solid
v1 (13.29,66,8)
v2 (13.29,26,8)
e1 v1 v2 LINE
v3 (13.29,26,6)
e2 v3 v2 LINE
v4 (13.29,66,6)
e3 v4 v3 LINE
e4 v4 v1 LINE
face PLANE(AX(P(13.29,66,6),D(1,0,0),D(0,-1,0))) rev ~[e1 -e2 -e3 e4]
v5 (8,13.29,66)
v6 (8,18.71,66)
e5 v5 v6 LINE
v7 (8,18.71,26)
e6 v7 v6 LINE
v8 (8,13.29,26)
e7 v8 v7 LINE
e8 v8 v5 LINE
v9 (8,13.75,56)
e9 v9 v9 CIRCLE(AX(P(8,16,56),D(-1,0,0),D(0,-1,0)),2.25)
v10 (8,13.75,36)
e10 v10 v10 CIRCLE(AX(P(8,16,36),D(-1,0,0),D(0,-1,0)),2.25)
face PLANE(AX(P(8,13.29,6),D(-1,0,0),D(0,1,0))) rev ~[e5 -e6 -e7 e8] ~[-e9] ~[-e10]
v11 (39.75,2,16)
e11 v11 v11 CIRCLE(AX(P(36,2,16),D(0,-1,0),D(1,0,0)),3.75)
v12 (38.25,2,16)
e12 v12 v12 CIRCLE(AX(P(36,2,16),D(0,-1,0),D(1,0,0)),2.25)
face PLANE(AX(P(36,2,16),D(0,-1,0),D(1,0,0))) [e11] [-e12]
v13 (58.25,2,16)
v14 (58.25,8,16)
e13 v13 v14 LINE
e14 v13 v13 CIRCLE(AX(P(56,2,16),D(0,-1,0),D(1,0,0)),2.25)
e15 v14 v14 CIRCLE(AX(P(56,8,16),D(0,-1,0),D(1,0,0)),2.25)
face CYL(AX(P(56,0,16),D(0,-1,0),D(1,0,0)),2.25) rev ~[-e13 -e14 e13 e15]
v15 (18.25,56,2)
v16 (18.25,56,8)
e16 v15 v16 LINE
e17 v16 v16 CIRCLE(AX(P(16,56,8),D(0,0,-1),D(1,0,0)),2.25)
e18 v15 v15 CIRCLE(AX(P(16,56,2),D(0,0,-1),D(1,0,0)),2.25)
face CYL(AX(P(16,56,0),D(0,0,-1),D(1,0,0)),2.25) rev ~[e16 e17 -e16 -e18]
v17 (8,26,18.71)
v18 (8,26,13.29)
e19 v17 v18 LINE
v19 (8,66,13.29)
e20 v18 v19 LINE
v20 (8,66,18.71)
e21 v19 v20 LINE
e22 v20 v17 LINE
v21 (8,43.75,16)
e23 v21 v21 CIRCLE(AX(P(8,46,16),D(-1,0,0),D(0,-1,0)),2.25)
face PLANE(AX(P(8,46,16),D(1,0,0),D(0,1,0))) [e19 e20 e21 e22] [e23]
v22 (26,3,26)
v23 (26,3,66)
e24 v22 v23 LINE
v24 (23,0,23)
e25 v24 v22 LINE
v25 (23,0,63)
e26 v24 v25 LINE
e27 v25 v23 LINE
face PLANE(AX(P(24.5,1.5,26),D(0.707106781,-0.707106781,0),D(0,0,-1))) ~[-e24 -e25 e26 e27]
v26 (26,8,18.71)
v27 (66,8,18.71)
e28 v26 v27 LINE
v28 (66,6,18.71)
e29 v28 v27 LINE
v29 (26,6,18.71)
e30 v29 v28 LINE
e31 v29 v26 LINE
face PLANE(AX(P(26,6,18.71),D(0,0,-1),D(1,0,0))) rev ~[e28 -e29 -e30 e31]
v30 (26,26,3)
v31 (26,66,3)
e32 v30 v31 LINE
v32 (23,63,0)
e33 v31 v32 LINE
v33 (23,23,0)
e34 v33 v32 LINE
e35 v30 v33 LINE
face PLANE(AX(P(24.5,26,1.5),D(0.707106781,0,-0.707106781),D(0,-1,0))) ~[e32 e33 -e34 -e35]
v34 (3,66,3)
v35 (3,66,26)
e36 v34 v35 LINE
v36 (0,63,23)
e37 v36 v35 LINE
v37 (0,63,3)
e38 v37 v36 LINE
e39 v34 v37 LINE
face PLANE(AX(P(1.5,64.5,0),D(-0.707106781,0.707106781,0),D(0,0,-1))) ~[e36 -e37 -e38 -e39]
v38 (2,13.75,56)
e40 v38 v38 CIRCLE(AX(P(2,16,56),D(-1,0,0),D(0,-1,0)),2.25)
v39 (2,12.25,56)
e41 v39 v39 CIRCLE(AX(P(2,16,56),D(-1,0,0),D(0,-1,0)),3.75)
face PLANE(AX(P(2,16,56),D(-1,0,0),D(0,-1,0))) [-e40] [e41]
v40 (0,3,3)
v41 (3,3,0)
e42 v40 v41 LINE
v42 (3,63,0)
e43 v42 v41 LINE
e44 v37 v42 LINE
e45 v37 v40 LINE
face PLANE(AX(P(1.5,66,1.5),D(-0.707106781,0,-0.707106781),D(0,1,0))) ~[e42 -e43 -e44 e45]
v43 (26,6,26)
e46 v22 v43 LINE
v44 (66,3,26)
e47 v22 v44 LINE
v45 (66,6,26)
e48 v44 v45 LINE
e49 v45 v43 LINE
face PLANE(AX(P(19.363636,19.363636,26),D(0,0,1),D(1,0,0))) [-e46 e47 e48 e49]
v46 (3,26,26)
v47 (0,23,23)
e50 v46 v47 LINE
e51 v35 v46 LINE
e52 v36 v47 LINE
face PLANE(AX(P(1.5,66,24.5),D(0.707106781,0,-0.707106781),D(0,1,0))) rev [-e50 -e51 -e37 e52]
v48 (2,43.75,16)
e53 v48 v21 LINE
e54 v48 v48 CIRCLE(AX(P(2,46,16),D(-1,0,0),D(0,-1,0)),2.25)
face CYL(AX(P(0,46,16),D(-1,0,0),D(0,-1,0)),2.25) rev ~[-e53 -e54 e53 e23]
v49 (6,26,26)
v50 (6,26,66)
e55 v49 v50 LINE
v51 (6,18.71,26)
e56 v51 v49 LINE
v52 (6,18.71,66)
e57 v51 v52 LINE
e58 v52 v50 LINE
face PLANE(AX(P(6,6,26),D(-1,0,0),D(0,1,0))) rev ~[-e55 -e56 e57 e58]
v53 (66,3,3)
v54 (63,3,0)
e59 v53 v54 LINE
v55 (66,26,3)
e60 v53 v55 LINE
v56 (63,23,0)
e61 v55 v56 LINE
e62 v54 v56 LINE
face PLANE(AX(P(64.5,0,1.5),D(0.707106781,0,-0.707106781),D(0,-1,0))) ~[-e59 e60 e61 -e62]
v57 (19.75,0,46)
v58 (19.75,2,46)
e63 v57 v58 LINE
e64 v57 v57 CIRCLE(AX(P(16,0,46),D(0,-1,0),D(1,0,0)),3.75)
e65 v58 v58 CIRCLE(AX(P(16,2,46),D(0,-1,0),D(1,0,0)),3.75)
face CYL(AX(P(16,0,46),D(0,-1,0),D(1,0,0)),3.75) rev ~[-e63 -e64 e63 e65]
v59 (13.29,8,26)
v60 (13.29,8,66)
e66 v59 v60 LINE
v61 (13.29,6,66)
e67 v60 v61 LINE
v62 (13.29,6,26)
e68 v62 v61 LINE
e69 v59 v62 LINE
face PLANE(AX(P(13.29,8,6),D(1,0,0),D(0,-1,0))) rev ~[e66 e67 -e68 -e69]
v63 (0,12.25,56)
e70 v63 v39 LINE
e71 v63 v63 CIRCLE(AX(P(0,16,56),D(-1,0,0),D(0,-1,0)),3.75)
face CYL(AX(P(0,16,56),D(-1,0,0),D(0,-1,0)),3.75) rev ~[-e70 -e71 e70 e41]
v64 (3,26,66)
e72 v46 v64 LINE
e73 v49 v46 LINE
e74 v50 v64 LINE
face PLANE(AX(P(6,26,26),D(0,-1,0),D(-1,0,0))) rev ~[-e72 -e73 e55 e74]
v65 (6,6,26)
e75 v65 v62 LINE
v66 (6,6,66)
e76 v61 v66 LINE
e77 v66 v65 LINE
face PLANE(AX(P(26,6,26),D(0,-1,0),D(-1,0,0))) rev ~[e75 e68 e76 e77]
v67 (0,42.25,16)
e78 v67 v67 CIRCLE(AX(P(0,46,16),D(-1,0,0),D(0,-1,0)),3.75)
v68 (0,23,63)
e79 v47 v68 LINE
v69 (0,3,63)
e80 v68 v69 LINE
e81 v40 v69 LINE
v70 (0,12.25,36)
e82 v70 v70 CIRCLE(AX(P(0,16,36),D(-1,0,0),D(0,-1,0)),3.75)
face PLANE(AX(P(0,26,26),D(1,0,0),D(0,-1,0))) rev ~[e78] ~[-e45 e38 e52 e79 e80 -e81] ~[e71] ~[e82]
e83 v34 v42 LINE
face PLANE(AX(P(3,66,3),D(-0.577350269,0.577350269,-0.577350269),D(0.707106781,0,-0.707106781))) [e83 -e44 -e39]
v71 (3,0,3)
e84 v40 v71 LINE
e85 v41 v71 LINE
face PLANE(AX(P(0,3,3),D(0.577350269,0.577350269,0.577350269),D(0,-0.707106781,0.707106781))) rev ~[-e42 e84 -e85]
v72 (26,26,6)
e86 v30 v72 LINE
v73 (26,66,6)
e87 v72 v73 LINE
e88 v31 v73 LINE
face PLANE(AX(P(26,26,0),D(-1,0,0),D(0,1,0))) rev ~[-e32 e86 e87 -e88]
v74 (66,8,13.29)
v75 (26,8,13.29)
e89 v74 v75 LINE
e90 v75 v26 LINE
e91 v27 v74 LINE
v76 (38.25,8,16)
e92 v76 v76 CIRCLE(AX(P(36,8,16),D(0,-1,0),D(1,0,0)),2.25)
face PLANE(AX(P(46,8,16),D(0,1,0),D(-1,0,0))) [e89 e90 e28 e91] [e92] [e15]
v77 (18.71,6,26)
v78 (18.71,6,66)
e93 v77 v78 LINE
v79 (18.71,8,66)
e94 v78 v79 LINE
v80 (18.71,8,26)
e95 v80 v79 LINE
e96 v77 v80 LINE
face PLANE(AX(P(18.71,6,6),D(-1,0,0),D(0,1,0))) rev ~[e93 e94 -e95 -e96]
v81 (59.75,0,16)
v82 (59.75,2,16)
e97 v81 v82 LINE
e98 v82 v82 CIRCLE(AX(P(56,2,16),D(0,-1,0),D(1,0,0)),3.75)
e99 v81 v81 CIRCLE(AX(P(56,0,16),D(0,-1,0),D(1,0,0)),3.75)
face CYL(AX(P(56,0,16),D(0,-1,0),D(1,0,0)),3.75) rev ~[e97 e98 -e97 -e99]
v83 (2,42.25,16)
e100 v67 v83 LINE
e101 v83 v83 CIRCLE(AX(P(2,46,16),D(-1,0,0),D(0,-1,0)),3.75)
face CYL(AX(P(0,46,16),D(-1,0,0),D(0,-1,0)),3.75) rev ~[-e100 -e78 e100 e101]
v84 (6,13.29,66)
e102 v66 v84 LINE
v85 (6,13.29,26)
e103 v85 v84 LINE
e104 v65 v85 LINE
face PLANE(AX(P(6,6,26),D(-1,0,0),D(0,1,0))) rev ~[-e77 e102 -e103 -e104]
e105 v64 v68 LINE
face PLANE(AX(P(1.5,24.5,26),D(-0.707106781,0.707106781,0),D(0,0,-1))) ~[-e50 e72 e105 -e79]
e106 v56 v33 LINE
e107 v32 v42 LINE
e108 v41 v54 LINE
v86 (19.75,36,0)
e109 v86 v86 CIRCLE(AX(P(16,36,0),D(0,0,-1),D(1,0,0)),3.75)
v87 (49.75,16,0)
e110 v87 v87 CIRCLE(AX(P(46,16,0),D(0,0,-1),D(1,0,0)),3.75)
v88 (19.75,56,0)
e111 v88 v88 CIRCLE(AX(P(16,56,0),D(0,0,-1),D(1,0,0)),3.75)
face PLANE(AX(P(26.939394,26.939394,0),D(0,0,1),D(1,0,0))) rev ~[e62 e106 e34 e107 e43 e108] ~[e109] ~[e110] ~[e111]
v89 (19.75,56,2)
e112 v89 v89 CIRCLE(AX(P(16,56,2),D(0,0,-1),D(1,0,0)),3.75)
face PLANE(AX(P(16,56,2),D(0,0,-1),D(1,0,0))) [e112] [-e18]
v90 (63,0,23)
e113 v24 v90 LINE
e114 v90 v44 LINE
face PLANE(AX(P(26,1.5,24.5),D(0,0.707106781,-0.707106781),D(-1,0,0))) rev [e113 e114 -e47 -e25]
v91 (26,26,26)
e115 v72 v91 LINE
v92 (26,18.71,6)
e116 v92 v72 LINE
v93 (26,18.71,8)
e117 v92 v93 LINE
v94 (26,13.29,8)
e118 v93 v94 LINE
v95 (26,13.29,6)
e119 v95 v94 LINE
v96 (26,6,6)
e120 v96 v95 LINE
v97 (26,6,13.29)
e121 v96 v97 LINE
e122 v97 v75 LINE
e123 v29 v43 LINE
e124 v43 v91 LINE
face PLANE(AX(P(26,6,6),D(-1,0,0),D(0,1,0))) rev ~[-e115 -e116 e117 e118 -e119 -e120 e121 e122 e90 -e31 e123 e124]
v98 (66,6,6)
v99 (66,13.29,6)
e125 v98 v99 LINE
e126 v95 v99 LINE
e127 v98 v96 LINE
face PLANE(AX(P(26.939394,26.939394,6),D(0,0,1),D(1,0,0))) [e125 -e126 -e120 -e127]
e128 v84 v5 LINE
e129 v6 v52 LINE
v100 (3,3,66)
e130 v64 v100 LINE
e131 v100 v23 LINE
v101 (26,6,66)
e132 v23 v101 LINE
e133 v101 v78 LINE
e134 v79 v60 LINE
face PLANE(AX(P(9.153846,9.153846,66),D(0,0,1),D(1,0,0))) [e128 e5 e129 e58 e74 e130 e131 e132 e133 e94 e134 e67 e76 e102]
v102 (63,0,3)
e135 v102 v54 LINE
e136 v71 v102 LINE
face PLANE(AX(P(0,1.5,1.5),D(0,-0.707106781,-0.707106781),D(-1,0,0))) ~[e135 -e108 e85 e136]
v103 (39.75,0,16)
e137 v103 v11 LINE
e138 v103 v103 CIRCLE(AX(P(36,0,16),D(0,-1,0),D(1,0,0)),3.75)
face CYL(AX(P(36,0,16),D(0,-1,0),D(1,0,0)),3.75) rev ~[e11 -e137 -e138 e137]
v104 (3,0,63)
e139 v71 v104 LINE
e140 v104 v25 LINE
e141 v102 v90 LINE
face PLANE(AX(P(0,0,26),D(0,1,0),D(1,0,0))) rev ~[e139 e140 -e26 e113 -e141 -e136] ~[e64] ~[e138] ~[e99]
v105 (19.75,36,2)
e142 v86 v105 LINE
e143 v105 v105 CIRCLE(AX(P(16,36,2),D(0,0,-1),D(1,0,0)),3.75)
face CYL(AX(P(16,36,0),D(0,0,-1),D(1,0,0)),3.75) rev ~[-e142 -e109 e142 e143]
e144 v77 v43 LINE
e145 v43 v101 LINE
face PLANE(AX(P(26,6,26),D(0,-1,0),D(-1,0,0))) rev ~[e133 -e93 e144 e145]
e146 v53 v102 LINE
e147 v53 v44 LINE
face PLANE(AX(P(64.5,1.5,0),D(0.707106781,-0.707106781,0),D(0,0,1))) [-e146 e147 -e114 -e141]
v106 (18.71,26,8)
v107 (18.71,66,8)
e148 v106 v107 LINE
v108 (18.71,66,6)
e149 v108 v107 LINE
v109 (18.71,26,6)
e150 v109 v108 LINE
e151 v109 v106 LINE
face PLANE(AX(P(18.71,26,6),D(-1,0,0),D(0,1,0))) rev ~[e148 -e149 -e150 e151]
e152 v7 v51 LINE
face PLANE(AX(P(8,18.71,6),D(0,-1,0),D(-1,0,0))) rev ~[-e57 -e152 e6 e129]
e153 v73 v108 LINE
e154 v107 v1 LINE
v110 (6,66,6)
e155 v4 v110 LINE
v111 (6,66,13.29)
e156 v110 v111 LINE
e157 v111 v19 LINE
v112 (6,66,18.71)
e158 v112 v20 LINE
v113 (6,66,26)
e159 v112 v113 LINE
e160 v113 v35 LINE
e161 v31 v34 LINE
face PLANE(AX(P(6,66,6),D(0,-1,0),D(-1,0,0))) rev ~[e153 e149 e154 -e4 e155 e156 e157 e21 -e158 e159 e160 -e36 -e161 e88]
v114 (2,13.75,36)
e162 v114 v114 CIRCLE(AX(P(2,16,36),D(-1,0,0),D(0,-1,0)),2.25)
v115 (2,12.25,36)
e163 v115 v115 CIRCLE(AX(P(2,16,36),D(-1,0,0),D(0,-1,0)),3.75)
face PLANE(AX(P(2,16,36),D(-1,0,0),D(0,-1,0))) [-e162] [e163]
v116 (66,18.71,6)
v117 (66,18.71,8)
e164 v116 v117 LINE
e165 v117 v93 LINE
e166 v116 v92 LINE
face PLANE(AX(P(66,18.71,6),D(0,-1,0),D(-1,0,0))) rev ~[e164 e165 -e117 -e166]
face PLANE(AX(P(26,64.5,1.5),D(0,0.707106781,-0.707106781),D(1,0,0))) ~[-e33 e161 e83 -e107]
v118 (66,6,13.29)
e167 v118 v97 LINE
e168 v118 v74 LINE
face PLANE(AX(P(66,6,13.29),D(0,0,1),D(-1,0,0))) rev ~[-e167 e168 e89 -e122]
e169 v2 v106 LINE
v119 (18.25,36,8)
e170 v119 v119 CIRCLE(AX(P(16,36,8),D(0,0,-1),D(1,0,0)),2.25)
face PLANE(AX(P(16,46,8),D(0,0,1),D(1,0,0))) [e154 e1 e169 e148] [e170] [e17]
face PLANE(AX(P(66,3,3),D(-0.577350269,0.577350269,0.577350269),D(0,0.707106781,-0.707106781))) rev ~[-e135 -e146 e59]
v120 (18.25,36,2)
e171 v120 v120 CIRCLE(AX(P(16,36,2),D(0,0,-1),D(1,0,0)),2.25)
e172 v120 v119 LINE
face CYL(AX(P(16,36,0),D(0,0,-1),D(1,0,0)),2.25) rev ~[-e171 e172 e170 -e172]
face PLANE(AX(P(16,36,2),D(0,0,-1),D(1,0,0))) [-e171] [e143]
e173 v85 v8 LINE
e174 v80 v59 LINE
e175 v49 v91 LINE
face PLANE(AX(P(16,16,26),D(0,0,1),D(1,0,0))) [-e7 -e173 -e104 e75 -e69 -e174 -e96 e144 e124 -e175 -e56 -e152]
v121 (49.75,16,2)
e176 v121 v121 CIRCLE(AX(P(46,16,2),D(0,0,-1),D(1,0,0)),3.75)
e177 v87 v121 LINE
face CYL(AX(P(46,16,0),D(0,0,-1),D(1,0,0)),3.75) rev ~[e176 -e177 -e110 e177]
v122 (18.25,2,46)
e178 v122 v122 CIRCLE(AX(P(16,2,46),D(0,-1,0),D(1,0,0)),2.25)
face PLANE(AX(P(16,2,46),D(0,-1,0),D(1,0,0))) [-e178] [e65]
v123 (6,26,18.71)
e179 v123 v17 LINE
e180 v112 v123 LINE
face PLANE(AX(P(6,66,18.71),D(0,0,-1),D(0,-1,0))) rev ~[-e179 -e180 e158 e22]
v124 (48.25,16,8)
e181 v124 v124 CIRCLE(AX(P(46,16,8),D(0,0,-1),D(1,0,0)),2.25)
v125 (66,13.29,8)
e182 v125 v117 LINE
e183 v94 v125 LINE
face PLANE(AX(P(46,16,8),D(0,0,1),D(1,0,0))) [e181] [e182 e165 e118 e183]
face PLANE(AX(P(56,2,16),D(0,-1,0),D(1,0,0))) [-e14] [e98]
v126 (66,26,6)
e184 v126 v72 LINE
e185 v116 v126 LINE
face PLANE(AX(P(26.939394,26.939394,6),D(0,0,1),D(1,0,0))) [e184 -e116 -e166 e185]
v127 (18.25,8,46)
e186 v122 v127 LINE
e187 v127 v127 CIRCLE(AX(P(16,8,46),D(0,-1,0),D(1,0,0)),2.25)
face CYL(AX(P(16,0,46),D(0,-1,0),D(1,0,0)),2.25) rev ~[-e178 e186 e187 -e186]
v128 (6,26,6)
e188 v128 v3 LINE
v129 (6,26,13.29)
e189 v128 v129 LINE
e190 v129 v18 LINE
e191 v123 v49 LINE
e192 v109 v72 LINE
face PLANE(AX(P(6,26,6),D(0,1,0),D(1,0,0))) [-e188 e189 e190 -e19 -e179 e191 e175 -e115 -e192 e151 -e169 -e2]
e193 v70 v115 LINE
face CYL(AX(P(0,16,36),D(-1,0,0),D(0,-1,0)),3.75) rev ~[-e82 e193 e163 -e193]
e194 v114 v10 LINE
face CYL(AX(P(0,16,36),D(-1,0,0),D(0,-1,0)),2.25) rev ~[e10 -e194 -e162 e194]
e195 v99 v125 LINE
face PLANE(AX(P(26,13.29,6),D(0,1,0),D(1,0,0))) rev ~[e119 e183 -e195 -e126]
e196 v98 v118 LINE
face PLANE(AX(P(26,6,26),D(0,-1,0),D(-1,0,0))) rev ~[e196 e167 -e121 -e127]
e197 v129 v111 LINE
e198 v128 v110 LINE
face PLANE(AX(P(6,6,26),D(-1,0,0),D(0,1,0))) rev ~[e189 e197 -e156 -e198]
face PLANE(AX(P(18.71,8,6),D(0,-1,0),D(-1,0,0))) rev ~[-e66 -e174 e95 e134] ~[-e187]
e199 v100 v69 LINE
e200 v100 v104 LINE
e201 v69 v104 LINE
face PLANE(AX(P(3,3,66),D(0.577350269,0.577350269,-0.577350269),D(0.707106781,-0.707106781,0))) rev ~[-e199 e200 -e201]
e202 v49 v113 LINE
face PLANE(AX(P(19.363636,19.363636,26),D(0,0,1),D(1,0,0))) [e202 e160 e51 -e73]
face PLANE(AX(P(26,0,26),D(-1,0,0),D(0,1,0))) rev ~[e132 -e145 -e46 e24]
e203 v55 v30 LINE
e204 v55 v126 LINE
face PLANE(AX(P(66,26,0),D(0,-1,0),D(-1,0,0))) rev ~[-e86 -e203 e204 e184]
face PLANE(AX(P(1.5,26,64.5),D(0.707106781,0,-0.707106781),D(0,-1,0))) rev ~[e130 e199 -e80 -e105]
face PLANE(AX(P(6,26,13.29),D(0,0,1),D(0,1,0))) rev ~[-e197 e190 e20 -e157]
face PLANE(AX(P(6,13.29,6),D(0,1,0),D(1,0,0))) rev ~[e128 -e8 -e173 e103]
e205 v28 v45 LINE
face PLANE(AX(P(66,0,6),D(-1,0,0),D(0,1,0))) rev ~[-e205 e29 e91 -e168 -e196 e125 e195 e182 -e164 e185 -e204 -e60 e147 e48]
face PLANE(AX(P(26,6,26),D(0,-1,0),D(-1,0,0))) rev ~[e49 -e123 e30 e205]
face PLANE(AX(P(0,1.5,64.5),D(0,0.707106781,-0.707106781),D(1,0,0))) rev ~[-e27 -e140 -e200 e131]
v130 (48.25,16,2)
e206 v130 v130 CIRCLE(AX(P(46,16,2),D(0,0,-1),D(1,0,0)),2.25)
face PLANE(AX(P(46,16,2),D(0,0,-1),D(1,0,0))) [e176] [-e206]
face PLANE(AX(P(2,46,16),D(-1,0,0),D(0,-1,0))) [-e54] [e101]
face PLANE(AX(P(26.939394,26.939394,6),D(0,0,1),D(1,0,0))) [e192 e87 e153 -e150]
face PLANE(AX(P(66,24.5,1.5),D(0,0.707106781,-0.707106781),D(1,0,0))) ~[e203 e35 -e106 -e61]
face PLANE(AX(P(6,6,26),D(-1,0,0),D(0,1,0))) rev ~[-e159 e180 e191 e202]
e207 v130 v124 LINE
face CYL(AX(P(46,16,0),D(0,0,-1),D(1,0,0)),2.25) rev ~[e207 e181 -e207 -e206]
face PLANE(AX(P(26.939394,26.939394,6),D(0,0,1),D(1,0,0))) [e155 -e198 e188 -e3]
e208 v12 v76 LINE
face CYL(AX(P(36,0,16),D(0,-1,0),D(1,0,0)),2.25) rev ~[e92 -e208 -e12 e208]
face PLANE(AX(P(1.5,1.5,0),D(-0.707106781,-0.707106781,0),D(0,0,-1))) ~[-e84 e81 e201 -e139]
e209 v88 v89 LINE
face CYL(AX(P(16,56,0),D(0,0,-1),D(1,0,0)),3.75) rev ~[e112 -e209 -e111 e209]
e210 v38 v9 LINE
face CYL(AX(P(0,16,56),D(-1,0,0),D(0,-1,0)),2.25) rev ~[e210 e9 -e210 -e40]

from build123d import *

# Parameters (mm, degrees)
F1_DEPTH  = 6
F3_DEPTH  = 20
F5_DEPTH  = 40
F7_DEPTH  = 60
F9_DEPTH  = 2
F11_DEPTH = 2
F13_DEPTH = 2
F14_R     = 2.25
F15_DEPTH = 8
F16_R     = 2.25
F17_DEPTH = 8
F18_R     = 2.25
F19_DEPTH = 8
F20_R     = 3.75
F21_DEPTH = 2
F22_R     = 3.75
F23_DEPTH = 2
F24_R     = 3.75
F25_DEPTH = 2
F26_SIZE  = 3
F27_W     = 20
F27_H     = 20
F28_DEPTH = 20


with BuildPart() as f1:
    # F0 (on Top) → F1 (new body)
    with BuildSketch(Plane.XY):
        Polygon((0, 66), (0, 0), (66, 0), (66, 26), (26, 26), (26, 66), align=None)
    extrude(amount=F1_DEPTH)

    # F2 (on face) → F3 (join)
    with BuildSketch(Plane.XY.offset(6)):
        Polygon((6, 66), (0, 66), (0, 0), (66, 0), (66, 6), (6, 6), align=None)
    extrude(amount=F3_DEPTH)

    # F4 (on face) → F5 (join)
    with BuildSketch(Plane.XY.offset(26)):
        Polygon((6, 6), (6, 26), (0, 26), (0, 0), (26, 0), (26, 6), align=None)
    extrude(amount=F5_DEPTH)

    # F6 (on face) → F7 (join)
    with BuildSketch(Plane.XY.offset(6)):
        Polygon((13.29, 6), (16, 6), (18.71, 6), (18.71, 8), (13.29, 8), align=None)
        Polygon((6, 18.71), (6, 16), (6, 13.29), (8, 13.29), (8, 18.71), align=None)
    extrude(amount=F7_DEPTH)

    # F8 (on face) → F9 (join)
    with BuildSketch(Plane.XY.offset(6)):
        Polygon((66, 13.29), (66, 16), (66, 18.71), (26, 18.71), (26, 13.29), align=None)
        Polygon((18.71, 66), (16, 66), (13.29, 66), (13.29, 26), (18.71, 26), align=None)
    extrude(amount=F9_DEPTH)

    # F10 (on face) → F11 (join)
    with BuildSketch(Plane(origin=(0, 6, 0), x_dir=(-1, 0, 0), z_dir=(0, 1, 0))):
        Polygon((-66, 18.71), (-66, 16), (-66, 13.29), (-26, 13.29), (-26, 16), (-26, 18.71), align=None)
    extrude(amount=F11_DEPTH)

    # F12 (on face) → F13 (join)
    with BuildSketch(Plane.YZ.offset(6)):
        Polygon((66, 13.29), (66, 16), (66, 18.71), (26, 18.71), (26, 13.29), align=None)
    extrude(amount=F13_DEPTH)

    # F14 (on face) → F15 (cut, through all)
    with BuildSketch(Plane.XZ):
        with Locations((56, 16)):
            Circle(F14_R)
        with Locations((16, 46)):
            Circle(F14_R)
        with Locations((36, 16)):
            Circle(F14_R)
    extrude(amount=-F15_DEPTH, mode=Mode.SUBTRACT)

    # F16 (on face) → F17 (cut, through all)
    with BuildSketch(Plane(origin=(0, 0, 0), x_dir=(0, -1, 0), z_dir=(-1, 0, 0))):
        with Locations((-16, 56)):
            Circle(F16_R)
        with Locations((-46, 16)):
            Circle(F16_R)
        with Locations((-16, 36)):
            Circle(F16_R)
    extrude(amount=-F17_DEPTH, mode=Mode.SUBTRACT)

    # F18 (on face) → F19 (cut, through all)
    with BuildSketch(Plane(origin=(0, 0, 0), x_dir=(1, 0, 0), z_dir=(0, 0, -1))):
        with Locations((46, -16)):
            Circle(F18_R)
        with Locations((16, -56)):
            Circle(F18_R)
        with Locations((16, -36)):
            Circle(F18_R)
    extrude(amount=-F19_DEPTH, mode=Mode.SUBTRACT)

    # F20 (on face) → F21 (cut)
    with BuildSketch(Plane.XZ):
        with Locations((16, 46)):
            Circle(F20_R)
        with Locations((36, 16)):
            Circle(F20_R)
        with Locations((56, 16)):
            Circle(F20_R)
    extrude(amount=-F21_DEPTH, mode=Mode.SUBTRACT)

    # F22 (on face) → F23 (cut)
    with BuildSketch(Plane(origin=(0, 0, 0), x_dir=(0, -1, 0), z_dir=(-1, 0, 0))):
        with Locations((-16, 56)):
            Circle(F22_R)
        with Locations((-46, 16)):
            Circle(F22_R)
        with Locations((-16, 36)):
            Circle(F22_R)
    extrude(amount=-F23_DEPTH, mode=Mode.SUBTRACT)

    # F24 (on face) → F25 (cut)
    with BuildSketch(Plane(origin=(0, 0, 0), x_dir=(1, 0, 0), z_dir=(0, 0, -1))):
        with Locations((16, -56)):
            Circle(F24_R)
        with Locations((46, -16)):
            Circle(F24_R)
        with Locations((16, -36)):
            Circle(F24_R)
    extrude(amount=-F25_DEPTH, mode=Mode.SUBTRACT)

    # F26
    f26_edges = [f1.edges().sort_by_distance(p)[0] for p in [
        (33, 0, 0),
        (0, 33, 0),
        (0, 0, 33),
        (0, 26, 46),
        (0, 46, 26),
        (26, 0, 46),
        (46, 0, 26),
        (0, 13, 66),
        (13, 0, 66),
        (0, 66, 13),
        (13, 66, 0),
        (66, 0, 13),
        (66, 13, 0),
        (46, 26, 0),
        (26, 46, 0),
    ]]
    chamfer(f26_edges, length=F26_SIZE)

    # F27 (on face) → F28 (join)
    with BuildSketch(Plane.XY.offset(6)):
        with Locations((16, 16)):
            Rectangle(F27_W, F27_H)
    extrude(amount=F28_DEPTH)


solid = f1.part
